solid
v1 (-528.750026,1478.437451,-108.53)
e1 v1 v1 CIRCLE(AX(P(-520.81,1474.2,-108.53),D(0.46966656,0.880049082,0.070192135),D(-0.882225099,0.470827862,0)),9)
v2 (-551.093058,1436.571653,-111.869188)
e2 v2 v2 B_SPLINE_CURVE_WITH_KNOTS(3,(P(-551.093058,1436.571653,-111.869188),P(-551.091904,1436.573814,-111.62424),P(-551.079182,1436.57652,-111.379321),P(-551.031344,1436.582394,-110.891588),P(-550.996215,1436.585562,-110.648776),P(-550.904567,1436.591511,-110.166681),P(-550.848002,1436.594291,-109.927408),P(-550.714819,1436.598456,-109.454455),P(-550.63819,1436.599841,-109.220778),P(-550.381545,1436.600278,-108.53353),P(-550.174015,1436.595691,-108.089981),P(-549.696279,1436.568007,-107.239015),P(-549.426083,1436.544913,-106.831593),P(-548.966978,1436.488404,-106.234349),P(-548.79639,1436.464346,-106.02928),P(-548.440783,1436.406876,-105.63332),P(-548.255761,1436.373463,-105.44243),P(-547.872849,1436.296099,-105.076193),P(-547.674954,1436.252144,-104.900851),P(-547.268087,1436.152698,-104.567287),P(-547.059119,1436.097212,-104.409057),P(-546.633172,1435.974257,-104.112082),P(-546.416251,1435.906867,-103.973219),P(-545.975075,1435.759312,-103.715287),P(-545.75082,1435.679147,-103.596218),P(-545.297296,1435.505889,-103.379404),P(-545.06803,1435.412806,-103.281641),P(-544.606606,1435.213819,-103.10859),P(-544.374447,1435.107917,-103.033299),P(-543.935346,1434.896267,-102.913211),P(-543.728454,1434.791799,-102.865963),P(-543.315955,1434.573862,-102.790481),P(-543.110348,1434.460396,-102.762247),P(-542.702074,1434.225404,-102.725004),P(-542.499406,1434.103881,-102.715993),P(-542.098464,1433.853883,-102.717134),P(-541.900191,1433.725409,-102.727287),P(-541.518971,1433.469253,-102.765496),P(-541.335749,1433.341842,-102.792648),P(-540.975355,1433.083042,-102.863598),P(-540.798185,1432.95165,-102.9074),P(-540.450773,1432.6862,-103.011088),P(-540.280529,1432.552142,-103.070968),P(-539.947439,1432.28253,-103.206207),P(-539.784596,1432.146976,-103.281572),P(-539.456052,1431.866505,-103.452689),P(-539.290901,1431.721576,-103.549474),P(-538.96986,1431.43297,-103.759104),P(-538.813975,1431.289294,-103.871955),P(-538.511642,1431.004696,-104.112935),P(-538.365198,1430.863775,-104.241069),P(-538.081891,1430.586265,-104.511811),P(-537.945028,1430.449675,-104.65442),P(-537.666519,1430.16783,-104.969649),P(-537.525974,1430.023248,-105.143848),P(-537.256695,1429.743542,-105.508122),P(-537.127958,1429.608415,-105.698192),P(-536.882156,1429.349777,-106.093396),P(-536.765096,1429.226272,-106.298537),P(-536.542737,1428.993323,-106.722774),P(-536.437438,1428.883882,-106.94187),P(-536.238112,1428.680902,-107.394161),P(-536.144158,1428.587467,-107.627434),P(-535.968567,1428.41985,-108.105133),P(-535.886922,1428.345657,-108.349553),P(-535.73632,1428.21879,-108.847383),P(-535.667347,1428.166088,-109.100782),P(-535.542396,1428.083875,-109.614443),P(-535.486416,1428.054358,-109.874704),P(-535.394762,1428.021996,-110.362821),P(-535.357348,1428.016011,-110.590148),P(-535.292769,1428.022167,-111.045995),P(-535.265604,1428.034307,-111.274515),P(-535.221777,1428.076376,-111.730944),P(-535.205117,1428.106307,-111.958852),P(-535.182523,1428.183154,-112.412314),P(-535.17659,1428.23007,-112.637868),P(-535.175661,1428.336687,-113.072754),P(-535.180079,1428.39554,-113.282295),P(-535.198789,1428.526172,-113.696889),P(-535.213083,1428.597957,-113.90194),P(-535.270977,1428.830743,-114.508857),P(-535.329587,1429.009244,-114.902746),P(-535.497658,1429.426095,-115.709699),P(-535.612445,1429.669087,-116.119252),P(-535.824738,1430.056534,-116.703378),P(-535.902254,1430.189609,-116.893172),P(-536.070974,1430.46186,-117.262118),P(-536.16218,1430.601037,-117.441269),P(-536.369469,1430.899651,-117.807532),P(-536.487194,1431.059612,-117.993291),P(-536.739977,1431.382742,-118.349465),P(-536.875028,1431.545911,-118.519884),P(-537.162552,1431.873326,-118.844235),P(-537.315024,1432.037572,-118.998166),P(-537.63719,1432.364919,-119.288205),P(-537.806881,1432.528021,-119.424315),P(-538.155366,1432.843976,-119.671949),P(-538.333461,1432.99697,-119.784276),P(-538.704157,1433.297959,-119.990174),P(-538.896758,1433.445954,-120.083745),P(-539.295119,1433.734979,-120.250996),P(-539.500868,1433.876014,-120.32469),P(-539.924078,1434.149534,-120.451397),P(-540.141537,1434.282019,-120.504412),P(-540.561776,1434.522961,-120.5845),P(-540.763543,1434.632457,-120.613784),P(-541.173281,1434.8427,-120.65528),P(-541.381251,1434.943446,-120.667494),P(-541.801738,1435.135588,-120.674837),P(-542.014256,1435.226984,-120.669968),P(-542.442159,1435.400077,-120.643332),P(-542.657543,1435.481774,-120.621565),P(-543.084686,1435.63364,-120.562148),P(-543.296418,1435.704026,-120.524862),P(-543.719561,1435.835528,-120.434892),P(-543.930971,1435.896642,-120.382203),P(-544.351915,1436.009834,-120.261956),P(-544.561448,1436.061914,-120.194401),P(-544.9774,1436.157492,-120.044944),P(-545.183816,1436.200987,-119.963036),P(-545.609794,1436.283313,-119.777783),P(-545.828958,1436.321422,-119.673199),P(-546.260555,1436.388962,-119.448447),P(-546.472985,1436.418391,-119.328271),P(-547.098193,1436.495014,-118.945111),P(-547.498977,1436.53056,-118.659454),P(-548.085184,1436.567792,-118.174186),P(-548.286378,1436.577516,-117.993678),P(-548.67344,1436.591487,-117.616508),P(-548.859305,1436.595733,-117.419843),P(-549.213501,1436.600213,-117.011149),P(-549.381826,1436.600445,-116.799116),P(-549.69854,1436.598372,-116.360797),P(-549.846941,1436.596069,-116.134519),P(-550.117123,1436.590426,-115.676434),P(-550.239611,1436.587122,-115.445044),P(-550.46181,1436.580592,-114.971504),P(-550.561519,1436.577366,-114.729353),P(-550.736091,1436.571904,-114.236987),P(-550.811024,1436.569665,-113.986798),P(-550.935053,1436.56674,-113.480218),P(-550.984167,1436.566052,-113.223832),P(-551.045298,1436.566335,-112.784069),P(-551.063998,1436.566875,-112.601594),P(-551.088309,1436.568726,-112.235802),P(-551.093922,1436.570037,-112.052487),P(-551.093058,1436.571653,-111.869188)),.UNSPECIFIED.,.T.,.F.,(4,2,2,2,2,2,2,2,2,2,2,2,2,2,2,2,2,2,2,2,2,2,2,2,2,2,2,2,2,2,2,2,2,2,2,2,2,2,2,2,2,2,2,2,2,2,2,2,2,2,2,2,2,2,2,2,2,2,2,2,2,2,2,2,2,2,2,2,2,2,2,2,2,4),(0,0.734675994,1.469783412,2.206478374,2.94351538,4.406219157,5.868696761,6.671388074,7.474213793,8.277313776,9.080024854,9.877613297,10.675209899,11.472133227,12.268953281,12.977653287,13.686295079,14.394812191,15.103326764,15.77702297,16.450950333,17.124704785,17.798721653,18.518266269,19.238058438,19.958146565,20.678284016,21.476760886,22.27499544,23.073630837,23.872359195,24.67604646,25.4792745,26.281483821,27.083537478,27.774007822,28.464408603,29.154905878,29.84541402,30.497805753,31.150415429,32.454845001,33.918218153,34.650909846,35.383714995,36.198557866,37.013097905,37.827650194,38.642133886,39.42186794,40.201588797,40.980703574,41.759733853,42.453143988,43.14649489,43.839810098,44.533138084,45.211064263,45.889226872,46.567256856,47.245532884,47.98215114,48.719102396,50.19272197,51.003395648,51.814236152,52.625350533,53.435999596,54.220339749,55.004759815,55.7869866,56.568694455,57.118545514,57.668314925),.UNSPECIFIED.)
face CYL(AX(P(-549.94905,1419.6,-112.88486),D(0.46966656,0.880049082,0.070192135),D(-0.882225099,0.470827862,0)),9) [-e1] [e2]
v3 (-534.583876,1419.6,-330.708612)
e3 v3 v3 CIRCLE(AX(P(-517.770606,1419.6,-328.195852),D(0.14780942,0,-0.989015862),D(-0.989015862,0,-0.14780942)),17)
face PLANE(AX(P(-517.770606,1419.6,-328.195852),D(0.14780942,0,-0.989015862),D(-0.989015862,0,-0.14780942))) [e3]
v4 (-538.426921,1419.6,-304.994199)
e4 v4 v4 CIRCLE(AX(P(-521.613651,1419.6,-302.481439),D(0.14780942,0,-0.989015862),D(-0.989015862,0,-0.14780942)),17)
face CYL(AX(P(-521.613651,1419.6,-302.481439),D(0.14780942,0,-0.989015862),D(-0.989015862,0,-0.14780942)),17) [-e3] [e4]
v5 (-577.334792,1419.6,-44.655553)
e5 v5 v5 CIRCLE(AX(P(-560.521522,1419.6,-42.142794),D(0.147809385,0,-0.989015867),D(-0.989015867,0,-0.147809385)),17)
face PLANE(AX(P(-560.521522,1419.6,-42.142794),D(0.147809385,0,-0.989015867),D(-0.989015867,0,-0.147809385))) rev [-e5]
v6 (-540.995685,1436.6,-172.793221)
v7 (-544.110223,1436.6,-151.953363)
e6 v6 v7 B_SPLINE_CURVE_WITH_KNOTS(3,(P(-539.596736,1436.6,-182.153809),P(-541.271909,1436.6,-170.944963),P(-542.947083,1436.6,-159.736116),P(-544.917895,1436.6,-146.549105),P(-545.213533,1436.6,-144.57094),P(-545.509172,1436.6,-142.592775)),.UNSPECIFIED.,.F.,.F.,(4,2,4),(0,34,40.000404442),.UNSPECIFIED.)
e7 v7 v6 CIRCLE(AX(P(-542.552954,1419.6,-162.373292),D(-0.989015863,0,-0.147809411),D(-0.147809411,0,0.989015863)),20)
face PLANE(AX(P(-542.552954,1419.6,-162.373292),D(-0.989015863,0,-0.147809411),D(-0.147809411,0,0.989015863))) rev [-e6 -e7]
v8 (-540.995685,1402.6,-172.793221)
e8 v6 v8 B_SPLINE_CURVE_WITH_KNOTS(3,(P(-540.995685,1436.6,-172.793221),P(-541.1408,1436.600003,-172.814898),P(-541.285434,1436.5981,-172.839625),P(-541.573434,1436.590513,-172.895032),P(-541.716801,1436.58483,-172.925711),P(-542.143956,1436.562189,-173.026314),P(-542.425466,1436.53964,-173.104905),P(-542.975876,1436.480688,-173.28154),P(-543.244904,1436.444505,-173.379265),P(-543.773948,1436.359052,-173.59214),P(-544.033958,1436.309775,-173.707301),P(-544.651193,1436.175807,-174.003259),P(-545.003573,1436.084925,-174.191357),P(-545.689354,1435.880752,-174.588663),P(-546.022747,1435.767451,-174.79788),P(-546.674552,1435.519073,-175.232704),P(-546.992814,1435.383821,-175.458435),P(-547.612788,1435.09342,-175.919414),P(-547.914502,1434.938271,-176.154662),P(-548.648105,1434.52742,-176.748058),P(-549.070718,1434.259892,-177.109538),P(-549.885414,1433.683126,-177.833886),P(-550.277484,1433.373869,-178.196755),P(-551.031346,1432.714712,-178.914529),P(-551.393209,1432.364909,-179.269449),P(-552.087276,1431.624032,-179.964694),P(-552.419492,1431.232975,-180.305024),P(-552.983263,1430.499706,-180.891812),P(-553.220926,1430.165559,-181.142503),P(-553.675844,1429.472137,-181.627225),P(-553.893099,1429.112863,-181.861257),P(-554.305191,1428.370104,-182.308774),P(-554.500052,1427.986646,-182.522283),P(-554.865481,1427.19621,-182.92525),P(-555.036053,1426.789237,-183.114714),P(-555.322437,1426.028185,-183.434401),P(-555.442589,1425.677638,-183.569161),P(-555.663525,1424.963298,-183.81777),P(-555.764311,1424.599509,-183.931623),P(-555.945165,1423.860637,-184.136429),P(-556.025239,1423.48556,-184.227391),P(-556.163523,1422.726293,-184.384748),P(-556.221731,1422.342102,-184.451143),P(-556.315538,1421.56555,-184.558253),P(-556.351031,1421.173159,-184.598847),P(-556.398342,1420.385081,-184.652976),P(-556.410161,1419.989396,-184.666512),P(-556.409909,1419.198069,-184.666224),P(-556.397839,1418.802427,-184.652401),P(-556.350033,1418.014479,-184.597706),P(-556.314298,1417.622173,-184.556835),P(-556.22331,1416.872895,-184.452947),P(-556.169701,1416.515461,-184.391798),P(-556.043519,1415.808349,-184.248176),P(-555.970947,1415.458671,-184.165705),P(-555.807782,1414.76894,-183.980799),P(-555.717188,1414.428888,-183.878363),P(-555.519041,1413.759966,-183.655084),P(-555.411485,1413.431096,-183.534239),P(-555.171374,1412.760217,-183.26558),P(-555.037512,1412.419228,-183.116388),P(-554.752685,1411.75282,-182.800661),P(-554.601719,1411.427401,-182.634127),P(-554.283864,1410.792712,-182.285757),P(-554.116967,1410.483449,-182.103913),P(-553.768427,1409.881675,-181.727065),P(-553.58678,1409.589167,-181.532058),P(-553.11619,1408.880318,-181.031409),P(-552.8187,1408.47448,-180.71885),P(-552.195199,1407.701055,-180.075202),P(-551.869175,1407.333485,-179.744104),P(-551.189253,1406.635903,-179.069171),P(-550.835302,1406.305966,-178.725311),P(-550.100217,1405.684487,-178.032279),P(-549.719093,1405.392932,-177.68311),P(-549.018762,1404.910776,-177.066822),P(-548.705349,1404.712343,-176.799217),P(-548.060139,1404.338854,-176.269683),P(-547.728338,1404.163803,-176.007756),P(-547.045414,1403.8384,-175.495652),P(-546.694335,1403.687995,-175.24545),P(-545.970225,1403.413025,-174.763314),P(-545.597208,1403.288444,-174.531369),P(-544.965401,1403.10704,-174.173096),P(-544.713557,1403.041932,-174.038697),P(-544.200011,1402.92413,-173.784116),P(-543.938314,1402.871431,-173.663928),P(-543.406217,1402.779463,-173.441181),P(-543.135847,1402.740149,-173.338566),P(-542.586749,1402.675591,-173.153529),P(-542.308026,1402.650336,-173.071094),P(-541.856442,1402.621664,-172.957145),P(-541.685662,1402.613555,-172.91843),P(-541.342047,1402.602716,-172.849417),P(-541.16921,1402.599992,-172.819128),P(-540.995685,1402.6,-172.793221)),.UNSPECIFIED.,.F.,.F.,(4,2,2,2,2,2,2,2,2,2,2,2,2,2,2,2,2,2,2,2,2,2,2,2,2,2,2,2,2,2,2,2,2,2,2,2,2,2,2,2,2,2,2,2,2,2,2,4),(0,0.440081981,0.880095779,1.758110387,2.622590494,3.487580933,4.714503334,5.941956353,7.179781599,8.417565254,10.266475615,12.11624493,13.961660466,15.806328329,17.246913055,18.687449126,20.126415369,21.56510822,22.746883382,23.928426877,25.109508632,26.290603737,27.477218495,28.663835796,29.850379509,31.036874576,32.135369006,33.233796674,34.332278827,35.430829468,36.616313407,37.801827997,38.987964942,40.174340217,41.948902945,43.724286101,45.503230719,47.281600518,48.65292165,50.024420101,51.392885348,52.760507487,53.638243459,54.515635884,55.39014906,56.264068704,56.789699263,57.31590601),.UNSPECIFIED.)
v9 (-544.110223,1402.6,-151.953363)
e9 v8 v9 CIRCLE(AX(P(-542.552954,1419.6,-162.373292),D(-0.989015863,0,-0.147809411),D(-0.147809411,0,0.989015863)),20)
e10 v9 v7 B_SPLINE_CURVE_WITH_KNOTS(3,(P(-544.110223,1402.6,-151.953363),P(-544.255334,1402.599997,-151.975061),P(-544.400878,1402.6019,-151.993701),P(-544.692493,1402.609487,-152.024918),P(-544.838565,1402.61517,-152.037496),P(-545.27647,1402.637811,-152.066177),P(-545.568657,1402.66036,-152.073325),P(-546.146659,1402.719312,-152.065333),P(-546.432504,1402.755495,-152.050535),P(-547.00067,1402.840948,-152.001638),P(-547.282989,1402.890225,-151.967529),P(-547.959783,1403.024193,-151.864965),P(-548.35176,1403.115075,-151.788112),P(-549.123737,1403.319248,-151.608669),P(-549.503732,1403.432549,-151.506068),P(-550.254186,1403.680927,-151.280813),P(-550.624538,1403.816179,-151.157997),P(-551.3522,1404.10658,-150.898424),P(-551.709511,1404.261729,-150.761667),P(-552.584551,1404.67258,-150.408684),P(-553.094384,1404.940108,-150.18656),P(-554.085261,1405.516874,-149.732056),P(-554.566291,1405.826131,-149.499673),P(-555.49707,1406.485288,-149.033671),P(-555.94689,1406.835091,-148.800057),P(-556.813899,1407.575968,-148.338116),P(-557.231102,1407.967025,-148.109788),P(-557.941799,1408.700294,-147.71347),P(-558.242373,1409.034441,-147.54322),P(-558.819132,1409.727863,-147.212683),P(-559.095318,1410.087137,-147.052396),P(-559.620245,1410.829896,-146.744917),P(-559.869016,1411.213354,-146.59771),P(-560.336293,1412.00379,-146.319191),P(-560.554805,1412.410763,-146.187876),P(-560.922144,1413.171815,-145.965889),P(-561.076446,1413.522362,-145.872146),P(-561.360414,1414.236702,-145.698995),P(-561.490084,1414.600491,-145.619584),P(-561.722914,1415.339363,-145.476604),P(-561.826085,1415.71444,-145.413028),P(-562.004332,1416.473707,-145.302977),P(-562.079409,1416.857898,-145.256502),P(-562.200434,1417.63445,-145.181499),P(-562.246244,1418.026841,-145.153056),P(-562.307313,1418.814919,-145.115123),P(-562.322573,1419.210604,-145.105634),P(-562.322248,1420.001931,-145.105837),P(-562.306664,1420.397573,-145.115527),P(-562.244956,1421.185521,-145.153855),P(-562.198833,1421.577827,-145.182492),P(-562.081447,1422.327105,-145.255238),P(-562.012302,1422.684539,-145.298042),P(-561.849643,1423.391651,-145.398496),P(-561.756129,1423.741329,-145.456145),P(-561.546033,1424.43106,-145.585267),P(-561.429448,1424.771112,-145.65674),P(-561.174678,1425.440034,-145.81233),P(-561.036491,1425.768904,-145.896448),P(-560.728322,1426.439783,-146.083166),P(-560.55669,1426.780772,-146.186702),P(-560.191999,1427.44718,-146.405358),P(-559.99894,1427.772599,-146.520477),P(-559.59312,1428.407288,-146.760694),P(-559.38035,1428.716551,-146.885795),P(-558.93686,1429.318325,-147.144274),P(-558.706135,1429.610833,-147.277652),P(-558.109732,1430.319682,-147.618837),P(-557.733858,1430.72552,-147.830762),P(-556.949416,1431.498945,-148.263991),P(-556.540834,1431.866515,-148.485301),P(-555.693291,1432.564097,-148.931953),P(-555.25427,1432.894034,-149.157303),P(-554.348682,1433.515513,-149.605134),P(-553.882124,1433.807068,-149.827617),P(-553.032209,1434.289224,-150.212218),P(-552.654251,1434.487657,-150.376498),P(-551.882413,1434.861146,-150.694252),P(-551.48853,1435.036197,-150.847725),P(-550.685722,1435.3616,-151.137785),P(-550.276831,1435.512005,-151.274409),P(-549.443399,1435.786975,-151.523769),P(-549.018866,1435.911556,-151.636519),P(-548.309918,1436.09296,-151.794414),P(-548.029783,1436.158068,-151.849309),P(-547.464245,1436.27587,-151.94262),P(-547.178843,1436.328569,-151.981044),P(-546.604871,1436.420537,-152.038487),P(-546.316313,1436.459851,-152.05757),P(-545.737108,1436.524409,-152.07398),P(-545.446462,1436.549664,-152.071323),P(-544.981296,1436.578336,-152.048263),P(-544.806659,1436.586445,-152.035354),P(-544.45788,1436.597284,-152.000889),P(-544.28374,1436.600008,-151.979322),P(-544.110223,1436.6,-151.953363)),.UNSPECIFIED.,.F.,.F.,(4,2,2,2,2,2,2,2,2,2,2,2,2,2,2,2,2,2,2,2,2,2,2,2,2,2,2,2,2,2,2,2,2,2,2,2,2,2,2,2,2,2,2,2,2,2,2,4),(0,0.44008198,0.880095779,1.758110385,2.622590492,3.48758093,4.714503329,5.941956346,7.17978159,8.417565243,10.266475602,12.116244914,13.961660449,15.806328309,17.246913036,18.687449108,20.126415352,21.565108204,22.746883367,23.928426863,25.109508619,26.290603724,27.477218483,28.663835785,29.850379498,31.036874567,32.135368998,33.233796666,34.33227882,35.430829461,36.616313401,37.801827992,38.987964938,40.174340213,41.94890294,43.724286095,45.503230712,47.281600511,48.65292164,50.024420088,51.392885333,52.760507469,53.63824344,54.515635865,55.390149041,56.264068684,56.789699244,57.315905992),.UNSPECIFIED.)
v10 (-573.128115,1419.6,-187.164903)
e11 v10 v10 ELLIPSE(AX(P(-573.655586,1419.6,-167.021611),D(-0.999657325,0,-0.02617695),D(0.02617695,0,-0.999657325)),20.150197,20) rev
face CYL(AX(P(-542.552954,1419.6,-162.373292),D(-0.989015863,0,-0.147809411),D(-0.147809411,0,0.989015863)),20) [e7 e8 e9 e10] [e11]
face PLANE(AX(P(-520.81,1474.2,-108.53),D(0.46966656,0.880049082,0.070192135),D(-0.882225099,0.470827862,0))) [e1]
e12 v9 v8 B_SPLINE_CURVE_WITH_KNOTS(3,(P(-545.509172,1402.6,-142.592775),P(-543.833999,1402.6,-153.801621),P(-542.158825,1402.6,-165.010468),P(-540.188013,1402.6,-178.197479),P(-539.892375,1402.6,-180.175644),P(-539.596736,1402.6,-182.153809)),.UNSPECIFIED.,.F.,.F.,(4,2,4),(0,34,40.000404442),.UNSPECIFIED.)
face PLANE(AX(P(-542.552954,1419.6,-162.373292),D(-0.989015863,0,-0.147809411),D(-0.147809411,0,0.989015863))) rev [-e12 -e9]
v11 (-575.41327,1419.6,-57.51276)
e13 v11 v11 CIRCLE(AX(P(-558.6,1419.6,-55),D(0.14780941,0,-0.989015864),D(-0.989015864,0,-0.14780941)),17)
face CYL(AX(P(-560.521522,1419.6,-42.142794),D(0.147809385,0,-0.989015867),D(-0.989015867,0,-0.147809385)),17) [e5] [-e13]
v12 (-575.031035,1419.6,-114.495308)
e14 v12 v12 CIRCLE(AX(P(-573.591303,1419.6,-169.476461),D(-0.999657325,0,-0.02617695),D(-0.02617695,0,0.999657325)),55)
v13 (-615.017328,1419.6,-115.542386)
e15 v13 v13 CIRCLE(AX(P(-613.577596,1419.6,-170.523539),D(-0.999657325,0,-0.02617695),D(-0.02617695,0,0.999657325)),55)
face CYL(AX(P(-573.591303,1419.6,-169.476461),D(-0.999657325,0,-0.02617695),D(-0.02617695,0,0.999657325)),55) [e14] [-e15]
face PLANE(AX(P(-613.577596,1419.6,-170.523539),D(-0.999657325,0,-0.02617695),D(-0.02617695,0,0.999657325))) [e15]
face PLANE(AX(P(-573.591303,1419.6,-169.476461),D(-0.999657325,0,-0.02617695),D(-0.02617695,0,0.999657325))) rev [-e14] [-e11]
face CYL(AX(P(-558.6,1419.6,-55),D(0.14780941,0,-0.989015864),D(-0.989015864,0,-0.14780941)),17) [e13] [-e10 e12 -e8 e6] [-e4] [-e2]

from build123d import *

# Parameters (mm, degrees)
SUSP_RL_UCA_BALL_JOINT_PROFILE_R  = 17
SUSP_RL_LCA_BALL_JOINT_PROFILE_R  = 17
SUSP_RL_UPRIGHT_KINGPIN_START     = -15.170463608
SUSP_RL_UPRIGHT_KINGPIN_OUTLINE_R = 17
SUSP_RL_UPRIGHT_KINGPIN_DEPTH     = 237.229999131
SUSP_RL_UPRIGHT_SPINDLE_PROFILE_R = 20
SUSP_RL_UPRIGHT_ARM_PROFILE_R     = 9
SUSP_RL_HUB_PROFILE_R             = 55


# Read off the part's stored shape, not the designer's step: SUSP_RL_upright_kingpin
with BuildPart() as part:
    # SUSP_RL_UCA_ball_joint: sweep along a curve in space
    with BuildLine() as susp_rl_uca_ball_joint_path:
        Line((-521.613651, 1419.6, -302.481439), (-517.770606, 1419.6, -328.195852))
    # SUSP_RL_UCA_ball_joint profile (on start of the path) → SUSP_RL_UCA_ball_joint (sweep)
    with BuildSketch(Plane(origin=(-521.613651, 1419.6, -302.481439), x_dir=(-0.9890158620797268, 0, -0.14780941970894487), z_dir=(0.14780941970894487, 0, -0.9890158620797268))):
        Circle(SUSP_RL_UCA_BALL_JOINT_PROFILE_R)
    sweep(path=susp_rl_uca_ball_joint_path.line)


with BuildPart() as body_2:
    # SUSP_RL_LCA_ball_joint: sweep along a curve in space
    with BuildLine() as susp_rl_lca_ball_joint_path:
        Line((-560.521522, 1419.6, -42.1427938), (-556.678478, 1419.6, -67.8572062))
    # SUSP_RL_LCA_ball_joint profile (on start of the path) → SUSP_RL_LCA_ball_joint (sweep)
    with BuildSketch(Plane(origin=(-560.521522, 1419.6, -42.1427938), x_dir=(-0.9890158671980833, 0, -0.14780938546121916), z_dir=(0.14780938546121916, 0, -0.9890158671980833))):
        Circle(SUSP_RL_LCA_BALL_JOINT_PROFILE_R)
    sweep(path=susp_rl_lca_ball_joint_path.line)


with BuildPart() as susp_rl_upright_kingpin_tool:
    # SUSP_RL_upright_kingpin outline → SUSP_RL_upright_kingpin (new body)
    with BuildSketch(Plane(origin=(0, 0, 0), x_dir=(0.9890158635477251, 0, 0.14780940988633906), z_dir=(0.14780940988633903, 0, -0.9890158635477251)).offset(SUSP_RL_UPRIGHT_KINGPIN_START)):
        with Locations((-560.593778922, -1419.6)):
            Circle(SUSP_RL_UPRIGHT_KINGPIN_OUTLINE_R)
    extrude(amount=SUSP_RL_UPRIGHT_KINGPIN_DEPTH)


with BuildPart() as part_1:
    add(part.part)


with BuildPart() as part_2:
    # SUSP_RL_upright_kingpin: joined with susp_rl_upright_kingpin_tool
    add(part_1.part.fuse(susp_rl_upright_kingpin_tool.part, body_2.part, tol=0.00001))

    # SUSP_RL_upright_spindle: sweep along a curve in space
    with BuildLine() as susp_rl_upright_spindle_path:
        Line((-542.552954, 1419.6, -162.373292), (-593.584449, 1419.6, -170))
    # SUSP_RL_upright_spindle profile (on start of the path) → SUSP_RL_upright_spindle (sweep)
    with BuildSketch(Plane(origin=(-542.552954, 1419.6, -162.373292), x_dir=(0.14780941059704947, 0, -0.9890158634415087), z_dir=(-0.9890158634415087, 0, -0.14780941059704947))):
        Circle(SUSP_RL_UPRIGHT_SPINDLE_PROFILE_R)
    sweep(path=susp_rl_upright_spindle_path.line)

    # SUSP_RL_upright_arm: sweep along a curve in space
    with BuildLine() as susp_rl_upright_arm_path:
        Line((-549.94905, 1419.6, -112.88486), (-520.81, 1474.2, -108.53))
    # SUSP_RL_upright_arm profile (on start of the path) → SUSP_RL_upright_arm (sweep)
    with BuildSketch(Plane(origin=(-549.94905, 1419.6, -112.88486), x_dir=(0.8822250985406449, -0.47082786186137016, 0), z_dir=(0.46966656036901244, 0.8800490817699289, 0.07019213450982756))):
        Circle(SUSP_RL_UPRIGHT_ARM_PROFILE_R)
    sweep(path=susp_rl_upright_arm_path.line)

    # SUSP_RL_hub: sweep along a curve in space
    with BuildLine() as susp_rl_hub_path:
        Line((-573.591303, 1419.6, -169.476461), (-613.577596, 1419.6, -170.523539))
    # SUSP_RL_hub profile (on start of the path) → SUSP_RL_hub (sweep)
    with BuildSketch(Plane(origin=(-573.591303, 1419.6, -169.476461), x_dir=(0.026176949998200902, 0, -0.9996573249312944), z_dir=(-0.9996573249312944, 0, -0.026176949998200902))):
        Circle(SUSP_RL_HUB_PROFILE_R)
    sweep(path=susp_rl_hub_path.line)


solid = part_2.part
